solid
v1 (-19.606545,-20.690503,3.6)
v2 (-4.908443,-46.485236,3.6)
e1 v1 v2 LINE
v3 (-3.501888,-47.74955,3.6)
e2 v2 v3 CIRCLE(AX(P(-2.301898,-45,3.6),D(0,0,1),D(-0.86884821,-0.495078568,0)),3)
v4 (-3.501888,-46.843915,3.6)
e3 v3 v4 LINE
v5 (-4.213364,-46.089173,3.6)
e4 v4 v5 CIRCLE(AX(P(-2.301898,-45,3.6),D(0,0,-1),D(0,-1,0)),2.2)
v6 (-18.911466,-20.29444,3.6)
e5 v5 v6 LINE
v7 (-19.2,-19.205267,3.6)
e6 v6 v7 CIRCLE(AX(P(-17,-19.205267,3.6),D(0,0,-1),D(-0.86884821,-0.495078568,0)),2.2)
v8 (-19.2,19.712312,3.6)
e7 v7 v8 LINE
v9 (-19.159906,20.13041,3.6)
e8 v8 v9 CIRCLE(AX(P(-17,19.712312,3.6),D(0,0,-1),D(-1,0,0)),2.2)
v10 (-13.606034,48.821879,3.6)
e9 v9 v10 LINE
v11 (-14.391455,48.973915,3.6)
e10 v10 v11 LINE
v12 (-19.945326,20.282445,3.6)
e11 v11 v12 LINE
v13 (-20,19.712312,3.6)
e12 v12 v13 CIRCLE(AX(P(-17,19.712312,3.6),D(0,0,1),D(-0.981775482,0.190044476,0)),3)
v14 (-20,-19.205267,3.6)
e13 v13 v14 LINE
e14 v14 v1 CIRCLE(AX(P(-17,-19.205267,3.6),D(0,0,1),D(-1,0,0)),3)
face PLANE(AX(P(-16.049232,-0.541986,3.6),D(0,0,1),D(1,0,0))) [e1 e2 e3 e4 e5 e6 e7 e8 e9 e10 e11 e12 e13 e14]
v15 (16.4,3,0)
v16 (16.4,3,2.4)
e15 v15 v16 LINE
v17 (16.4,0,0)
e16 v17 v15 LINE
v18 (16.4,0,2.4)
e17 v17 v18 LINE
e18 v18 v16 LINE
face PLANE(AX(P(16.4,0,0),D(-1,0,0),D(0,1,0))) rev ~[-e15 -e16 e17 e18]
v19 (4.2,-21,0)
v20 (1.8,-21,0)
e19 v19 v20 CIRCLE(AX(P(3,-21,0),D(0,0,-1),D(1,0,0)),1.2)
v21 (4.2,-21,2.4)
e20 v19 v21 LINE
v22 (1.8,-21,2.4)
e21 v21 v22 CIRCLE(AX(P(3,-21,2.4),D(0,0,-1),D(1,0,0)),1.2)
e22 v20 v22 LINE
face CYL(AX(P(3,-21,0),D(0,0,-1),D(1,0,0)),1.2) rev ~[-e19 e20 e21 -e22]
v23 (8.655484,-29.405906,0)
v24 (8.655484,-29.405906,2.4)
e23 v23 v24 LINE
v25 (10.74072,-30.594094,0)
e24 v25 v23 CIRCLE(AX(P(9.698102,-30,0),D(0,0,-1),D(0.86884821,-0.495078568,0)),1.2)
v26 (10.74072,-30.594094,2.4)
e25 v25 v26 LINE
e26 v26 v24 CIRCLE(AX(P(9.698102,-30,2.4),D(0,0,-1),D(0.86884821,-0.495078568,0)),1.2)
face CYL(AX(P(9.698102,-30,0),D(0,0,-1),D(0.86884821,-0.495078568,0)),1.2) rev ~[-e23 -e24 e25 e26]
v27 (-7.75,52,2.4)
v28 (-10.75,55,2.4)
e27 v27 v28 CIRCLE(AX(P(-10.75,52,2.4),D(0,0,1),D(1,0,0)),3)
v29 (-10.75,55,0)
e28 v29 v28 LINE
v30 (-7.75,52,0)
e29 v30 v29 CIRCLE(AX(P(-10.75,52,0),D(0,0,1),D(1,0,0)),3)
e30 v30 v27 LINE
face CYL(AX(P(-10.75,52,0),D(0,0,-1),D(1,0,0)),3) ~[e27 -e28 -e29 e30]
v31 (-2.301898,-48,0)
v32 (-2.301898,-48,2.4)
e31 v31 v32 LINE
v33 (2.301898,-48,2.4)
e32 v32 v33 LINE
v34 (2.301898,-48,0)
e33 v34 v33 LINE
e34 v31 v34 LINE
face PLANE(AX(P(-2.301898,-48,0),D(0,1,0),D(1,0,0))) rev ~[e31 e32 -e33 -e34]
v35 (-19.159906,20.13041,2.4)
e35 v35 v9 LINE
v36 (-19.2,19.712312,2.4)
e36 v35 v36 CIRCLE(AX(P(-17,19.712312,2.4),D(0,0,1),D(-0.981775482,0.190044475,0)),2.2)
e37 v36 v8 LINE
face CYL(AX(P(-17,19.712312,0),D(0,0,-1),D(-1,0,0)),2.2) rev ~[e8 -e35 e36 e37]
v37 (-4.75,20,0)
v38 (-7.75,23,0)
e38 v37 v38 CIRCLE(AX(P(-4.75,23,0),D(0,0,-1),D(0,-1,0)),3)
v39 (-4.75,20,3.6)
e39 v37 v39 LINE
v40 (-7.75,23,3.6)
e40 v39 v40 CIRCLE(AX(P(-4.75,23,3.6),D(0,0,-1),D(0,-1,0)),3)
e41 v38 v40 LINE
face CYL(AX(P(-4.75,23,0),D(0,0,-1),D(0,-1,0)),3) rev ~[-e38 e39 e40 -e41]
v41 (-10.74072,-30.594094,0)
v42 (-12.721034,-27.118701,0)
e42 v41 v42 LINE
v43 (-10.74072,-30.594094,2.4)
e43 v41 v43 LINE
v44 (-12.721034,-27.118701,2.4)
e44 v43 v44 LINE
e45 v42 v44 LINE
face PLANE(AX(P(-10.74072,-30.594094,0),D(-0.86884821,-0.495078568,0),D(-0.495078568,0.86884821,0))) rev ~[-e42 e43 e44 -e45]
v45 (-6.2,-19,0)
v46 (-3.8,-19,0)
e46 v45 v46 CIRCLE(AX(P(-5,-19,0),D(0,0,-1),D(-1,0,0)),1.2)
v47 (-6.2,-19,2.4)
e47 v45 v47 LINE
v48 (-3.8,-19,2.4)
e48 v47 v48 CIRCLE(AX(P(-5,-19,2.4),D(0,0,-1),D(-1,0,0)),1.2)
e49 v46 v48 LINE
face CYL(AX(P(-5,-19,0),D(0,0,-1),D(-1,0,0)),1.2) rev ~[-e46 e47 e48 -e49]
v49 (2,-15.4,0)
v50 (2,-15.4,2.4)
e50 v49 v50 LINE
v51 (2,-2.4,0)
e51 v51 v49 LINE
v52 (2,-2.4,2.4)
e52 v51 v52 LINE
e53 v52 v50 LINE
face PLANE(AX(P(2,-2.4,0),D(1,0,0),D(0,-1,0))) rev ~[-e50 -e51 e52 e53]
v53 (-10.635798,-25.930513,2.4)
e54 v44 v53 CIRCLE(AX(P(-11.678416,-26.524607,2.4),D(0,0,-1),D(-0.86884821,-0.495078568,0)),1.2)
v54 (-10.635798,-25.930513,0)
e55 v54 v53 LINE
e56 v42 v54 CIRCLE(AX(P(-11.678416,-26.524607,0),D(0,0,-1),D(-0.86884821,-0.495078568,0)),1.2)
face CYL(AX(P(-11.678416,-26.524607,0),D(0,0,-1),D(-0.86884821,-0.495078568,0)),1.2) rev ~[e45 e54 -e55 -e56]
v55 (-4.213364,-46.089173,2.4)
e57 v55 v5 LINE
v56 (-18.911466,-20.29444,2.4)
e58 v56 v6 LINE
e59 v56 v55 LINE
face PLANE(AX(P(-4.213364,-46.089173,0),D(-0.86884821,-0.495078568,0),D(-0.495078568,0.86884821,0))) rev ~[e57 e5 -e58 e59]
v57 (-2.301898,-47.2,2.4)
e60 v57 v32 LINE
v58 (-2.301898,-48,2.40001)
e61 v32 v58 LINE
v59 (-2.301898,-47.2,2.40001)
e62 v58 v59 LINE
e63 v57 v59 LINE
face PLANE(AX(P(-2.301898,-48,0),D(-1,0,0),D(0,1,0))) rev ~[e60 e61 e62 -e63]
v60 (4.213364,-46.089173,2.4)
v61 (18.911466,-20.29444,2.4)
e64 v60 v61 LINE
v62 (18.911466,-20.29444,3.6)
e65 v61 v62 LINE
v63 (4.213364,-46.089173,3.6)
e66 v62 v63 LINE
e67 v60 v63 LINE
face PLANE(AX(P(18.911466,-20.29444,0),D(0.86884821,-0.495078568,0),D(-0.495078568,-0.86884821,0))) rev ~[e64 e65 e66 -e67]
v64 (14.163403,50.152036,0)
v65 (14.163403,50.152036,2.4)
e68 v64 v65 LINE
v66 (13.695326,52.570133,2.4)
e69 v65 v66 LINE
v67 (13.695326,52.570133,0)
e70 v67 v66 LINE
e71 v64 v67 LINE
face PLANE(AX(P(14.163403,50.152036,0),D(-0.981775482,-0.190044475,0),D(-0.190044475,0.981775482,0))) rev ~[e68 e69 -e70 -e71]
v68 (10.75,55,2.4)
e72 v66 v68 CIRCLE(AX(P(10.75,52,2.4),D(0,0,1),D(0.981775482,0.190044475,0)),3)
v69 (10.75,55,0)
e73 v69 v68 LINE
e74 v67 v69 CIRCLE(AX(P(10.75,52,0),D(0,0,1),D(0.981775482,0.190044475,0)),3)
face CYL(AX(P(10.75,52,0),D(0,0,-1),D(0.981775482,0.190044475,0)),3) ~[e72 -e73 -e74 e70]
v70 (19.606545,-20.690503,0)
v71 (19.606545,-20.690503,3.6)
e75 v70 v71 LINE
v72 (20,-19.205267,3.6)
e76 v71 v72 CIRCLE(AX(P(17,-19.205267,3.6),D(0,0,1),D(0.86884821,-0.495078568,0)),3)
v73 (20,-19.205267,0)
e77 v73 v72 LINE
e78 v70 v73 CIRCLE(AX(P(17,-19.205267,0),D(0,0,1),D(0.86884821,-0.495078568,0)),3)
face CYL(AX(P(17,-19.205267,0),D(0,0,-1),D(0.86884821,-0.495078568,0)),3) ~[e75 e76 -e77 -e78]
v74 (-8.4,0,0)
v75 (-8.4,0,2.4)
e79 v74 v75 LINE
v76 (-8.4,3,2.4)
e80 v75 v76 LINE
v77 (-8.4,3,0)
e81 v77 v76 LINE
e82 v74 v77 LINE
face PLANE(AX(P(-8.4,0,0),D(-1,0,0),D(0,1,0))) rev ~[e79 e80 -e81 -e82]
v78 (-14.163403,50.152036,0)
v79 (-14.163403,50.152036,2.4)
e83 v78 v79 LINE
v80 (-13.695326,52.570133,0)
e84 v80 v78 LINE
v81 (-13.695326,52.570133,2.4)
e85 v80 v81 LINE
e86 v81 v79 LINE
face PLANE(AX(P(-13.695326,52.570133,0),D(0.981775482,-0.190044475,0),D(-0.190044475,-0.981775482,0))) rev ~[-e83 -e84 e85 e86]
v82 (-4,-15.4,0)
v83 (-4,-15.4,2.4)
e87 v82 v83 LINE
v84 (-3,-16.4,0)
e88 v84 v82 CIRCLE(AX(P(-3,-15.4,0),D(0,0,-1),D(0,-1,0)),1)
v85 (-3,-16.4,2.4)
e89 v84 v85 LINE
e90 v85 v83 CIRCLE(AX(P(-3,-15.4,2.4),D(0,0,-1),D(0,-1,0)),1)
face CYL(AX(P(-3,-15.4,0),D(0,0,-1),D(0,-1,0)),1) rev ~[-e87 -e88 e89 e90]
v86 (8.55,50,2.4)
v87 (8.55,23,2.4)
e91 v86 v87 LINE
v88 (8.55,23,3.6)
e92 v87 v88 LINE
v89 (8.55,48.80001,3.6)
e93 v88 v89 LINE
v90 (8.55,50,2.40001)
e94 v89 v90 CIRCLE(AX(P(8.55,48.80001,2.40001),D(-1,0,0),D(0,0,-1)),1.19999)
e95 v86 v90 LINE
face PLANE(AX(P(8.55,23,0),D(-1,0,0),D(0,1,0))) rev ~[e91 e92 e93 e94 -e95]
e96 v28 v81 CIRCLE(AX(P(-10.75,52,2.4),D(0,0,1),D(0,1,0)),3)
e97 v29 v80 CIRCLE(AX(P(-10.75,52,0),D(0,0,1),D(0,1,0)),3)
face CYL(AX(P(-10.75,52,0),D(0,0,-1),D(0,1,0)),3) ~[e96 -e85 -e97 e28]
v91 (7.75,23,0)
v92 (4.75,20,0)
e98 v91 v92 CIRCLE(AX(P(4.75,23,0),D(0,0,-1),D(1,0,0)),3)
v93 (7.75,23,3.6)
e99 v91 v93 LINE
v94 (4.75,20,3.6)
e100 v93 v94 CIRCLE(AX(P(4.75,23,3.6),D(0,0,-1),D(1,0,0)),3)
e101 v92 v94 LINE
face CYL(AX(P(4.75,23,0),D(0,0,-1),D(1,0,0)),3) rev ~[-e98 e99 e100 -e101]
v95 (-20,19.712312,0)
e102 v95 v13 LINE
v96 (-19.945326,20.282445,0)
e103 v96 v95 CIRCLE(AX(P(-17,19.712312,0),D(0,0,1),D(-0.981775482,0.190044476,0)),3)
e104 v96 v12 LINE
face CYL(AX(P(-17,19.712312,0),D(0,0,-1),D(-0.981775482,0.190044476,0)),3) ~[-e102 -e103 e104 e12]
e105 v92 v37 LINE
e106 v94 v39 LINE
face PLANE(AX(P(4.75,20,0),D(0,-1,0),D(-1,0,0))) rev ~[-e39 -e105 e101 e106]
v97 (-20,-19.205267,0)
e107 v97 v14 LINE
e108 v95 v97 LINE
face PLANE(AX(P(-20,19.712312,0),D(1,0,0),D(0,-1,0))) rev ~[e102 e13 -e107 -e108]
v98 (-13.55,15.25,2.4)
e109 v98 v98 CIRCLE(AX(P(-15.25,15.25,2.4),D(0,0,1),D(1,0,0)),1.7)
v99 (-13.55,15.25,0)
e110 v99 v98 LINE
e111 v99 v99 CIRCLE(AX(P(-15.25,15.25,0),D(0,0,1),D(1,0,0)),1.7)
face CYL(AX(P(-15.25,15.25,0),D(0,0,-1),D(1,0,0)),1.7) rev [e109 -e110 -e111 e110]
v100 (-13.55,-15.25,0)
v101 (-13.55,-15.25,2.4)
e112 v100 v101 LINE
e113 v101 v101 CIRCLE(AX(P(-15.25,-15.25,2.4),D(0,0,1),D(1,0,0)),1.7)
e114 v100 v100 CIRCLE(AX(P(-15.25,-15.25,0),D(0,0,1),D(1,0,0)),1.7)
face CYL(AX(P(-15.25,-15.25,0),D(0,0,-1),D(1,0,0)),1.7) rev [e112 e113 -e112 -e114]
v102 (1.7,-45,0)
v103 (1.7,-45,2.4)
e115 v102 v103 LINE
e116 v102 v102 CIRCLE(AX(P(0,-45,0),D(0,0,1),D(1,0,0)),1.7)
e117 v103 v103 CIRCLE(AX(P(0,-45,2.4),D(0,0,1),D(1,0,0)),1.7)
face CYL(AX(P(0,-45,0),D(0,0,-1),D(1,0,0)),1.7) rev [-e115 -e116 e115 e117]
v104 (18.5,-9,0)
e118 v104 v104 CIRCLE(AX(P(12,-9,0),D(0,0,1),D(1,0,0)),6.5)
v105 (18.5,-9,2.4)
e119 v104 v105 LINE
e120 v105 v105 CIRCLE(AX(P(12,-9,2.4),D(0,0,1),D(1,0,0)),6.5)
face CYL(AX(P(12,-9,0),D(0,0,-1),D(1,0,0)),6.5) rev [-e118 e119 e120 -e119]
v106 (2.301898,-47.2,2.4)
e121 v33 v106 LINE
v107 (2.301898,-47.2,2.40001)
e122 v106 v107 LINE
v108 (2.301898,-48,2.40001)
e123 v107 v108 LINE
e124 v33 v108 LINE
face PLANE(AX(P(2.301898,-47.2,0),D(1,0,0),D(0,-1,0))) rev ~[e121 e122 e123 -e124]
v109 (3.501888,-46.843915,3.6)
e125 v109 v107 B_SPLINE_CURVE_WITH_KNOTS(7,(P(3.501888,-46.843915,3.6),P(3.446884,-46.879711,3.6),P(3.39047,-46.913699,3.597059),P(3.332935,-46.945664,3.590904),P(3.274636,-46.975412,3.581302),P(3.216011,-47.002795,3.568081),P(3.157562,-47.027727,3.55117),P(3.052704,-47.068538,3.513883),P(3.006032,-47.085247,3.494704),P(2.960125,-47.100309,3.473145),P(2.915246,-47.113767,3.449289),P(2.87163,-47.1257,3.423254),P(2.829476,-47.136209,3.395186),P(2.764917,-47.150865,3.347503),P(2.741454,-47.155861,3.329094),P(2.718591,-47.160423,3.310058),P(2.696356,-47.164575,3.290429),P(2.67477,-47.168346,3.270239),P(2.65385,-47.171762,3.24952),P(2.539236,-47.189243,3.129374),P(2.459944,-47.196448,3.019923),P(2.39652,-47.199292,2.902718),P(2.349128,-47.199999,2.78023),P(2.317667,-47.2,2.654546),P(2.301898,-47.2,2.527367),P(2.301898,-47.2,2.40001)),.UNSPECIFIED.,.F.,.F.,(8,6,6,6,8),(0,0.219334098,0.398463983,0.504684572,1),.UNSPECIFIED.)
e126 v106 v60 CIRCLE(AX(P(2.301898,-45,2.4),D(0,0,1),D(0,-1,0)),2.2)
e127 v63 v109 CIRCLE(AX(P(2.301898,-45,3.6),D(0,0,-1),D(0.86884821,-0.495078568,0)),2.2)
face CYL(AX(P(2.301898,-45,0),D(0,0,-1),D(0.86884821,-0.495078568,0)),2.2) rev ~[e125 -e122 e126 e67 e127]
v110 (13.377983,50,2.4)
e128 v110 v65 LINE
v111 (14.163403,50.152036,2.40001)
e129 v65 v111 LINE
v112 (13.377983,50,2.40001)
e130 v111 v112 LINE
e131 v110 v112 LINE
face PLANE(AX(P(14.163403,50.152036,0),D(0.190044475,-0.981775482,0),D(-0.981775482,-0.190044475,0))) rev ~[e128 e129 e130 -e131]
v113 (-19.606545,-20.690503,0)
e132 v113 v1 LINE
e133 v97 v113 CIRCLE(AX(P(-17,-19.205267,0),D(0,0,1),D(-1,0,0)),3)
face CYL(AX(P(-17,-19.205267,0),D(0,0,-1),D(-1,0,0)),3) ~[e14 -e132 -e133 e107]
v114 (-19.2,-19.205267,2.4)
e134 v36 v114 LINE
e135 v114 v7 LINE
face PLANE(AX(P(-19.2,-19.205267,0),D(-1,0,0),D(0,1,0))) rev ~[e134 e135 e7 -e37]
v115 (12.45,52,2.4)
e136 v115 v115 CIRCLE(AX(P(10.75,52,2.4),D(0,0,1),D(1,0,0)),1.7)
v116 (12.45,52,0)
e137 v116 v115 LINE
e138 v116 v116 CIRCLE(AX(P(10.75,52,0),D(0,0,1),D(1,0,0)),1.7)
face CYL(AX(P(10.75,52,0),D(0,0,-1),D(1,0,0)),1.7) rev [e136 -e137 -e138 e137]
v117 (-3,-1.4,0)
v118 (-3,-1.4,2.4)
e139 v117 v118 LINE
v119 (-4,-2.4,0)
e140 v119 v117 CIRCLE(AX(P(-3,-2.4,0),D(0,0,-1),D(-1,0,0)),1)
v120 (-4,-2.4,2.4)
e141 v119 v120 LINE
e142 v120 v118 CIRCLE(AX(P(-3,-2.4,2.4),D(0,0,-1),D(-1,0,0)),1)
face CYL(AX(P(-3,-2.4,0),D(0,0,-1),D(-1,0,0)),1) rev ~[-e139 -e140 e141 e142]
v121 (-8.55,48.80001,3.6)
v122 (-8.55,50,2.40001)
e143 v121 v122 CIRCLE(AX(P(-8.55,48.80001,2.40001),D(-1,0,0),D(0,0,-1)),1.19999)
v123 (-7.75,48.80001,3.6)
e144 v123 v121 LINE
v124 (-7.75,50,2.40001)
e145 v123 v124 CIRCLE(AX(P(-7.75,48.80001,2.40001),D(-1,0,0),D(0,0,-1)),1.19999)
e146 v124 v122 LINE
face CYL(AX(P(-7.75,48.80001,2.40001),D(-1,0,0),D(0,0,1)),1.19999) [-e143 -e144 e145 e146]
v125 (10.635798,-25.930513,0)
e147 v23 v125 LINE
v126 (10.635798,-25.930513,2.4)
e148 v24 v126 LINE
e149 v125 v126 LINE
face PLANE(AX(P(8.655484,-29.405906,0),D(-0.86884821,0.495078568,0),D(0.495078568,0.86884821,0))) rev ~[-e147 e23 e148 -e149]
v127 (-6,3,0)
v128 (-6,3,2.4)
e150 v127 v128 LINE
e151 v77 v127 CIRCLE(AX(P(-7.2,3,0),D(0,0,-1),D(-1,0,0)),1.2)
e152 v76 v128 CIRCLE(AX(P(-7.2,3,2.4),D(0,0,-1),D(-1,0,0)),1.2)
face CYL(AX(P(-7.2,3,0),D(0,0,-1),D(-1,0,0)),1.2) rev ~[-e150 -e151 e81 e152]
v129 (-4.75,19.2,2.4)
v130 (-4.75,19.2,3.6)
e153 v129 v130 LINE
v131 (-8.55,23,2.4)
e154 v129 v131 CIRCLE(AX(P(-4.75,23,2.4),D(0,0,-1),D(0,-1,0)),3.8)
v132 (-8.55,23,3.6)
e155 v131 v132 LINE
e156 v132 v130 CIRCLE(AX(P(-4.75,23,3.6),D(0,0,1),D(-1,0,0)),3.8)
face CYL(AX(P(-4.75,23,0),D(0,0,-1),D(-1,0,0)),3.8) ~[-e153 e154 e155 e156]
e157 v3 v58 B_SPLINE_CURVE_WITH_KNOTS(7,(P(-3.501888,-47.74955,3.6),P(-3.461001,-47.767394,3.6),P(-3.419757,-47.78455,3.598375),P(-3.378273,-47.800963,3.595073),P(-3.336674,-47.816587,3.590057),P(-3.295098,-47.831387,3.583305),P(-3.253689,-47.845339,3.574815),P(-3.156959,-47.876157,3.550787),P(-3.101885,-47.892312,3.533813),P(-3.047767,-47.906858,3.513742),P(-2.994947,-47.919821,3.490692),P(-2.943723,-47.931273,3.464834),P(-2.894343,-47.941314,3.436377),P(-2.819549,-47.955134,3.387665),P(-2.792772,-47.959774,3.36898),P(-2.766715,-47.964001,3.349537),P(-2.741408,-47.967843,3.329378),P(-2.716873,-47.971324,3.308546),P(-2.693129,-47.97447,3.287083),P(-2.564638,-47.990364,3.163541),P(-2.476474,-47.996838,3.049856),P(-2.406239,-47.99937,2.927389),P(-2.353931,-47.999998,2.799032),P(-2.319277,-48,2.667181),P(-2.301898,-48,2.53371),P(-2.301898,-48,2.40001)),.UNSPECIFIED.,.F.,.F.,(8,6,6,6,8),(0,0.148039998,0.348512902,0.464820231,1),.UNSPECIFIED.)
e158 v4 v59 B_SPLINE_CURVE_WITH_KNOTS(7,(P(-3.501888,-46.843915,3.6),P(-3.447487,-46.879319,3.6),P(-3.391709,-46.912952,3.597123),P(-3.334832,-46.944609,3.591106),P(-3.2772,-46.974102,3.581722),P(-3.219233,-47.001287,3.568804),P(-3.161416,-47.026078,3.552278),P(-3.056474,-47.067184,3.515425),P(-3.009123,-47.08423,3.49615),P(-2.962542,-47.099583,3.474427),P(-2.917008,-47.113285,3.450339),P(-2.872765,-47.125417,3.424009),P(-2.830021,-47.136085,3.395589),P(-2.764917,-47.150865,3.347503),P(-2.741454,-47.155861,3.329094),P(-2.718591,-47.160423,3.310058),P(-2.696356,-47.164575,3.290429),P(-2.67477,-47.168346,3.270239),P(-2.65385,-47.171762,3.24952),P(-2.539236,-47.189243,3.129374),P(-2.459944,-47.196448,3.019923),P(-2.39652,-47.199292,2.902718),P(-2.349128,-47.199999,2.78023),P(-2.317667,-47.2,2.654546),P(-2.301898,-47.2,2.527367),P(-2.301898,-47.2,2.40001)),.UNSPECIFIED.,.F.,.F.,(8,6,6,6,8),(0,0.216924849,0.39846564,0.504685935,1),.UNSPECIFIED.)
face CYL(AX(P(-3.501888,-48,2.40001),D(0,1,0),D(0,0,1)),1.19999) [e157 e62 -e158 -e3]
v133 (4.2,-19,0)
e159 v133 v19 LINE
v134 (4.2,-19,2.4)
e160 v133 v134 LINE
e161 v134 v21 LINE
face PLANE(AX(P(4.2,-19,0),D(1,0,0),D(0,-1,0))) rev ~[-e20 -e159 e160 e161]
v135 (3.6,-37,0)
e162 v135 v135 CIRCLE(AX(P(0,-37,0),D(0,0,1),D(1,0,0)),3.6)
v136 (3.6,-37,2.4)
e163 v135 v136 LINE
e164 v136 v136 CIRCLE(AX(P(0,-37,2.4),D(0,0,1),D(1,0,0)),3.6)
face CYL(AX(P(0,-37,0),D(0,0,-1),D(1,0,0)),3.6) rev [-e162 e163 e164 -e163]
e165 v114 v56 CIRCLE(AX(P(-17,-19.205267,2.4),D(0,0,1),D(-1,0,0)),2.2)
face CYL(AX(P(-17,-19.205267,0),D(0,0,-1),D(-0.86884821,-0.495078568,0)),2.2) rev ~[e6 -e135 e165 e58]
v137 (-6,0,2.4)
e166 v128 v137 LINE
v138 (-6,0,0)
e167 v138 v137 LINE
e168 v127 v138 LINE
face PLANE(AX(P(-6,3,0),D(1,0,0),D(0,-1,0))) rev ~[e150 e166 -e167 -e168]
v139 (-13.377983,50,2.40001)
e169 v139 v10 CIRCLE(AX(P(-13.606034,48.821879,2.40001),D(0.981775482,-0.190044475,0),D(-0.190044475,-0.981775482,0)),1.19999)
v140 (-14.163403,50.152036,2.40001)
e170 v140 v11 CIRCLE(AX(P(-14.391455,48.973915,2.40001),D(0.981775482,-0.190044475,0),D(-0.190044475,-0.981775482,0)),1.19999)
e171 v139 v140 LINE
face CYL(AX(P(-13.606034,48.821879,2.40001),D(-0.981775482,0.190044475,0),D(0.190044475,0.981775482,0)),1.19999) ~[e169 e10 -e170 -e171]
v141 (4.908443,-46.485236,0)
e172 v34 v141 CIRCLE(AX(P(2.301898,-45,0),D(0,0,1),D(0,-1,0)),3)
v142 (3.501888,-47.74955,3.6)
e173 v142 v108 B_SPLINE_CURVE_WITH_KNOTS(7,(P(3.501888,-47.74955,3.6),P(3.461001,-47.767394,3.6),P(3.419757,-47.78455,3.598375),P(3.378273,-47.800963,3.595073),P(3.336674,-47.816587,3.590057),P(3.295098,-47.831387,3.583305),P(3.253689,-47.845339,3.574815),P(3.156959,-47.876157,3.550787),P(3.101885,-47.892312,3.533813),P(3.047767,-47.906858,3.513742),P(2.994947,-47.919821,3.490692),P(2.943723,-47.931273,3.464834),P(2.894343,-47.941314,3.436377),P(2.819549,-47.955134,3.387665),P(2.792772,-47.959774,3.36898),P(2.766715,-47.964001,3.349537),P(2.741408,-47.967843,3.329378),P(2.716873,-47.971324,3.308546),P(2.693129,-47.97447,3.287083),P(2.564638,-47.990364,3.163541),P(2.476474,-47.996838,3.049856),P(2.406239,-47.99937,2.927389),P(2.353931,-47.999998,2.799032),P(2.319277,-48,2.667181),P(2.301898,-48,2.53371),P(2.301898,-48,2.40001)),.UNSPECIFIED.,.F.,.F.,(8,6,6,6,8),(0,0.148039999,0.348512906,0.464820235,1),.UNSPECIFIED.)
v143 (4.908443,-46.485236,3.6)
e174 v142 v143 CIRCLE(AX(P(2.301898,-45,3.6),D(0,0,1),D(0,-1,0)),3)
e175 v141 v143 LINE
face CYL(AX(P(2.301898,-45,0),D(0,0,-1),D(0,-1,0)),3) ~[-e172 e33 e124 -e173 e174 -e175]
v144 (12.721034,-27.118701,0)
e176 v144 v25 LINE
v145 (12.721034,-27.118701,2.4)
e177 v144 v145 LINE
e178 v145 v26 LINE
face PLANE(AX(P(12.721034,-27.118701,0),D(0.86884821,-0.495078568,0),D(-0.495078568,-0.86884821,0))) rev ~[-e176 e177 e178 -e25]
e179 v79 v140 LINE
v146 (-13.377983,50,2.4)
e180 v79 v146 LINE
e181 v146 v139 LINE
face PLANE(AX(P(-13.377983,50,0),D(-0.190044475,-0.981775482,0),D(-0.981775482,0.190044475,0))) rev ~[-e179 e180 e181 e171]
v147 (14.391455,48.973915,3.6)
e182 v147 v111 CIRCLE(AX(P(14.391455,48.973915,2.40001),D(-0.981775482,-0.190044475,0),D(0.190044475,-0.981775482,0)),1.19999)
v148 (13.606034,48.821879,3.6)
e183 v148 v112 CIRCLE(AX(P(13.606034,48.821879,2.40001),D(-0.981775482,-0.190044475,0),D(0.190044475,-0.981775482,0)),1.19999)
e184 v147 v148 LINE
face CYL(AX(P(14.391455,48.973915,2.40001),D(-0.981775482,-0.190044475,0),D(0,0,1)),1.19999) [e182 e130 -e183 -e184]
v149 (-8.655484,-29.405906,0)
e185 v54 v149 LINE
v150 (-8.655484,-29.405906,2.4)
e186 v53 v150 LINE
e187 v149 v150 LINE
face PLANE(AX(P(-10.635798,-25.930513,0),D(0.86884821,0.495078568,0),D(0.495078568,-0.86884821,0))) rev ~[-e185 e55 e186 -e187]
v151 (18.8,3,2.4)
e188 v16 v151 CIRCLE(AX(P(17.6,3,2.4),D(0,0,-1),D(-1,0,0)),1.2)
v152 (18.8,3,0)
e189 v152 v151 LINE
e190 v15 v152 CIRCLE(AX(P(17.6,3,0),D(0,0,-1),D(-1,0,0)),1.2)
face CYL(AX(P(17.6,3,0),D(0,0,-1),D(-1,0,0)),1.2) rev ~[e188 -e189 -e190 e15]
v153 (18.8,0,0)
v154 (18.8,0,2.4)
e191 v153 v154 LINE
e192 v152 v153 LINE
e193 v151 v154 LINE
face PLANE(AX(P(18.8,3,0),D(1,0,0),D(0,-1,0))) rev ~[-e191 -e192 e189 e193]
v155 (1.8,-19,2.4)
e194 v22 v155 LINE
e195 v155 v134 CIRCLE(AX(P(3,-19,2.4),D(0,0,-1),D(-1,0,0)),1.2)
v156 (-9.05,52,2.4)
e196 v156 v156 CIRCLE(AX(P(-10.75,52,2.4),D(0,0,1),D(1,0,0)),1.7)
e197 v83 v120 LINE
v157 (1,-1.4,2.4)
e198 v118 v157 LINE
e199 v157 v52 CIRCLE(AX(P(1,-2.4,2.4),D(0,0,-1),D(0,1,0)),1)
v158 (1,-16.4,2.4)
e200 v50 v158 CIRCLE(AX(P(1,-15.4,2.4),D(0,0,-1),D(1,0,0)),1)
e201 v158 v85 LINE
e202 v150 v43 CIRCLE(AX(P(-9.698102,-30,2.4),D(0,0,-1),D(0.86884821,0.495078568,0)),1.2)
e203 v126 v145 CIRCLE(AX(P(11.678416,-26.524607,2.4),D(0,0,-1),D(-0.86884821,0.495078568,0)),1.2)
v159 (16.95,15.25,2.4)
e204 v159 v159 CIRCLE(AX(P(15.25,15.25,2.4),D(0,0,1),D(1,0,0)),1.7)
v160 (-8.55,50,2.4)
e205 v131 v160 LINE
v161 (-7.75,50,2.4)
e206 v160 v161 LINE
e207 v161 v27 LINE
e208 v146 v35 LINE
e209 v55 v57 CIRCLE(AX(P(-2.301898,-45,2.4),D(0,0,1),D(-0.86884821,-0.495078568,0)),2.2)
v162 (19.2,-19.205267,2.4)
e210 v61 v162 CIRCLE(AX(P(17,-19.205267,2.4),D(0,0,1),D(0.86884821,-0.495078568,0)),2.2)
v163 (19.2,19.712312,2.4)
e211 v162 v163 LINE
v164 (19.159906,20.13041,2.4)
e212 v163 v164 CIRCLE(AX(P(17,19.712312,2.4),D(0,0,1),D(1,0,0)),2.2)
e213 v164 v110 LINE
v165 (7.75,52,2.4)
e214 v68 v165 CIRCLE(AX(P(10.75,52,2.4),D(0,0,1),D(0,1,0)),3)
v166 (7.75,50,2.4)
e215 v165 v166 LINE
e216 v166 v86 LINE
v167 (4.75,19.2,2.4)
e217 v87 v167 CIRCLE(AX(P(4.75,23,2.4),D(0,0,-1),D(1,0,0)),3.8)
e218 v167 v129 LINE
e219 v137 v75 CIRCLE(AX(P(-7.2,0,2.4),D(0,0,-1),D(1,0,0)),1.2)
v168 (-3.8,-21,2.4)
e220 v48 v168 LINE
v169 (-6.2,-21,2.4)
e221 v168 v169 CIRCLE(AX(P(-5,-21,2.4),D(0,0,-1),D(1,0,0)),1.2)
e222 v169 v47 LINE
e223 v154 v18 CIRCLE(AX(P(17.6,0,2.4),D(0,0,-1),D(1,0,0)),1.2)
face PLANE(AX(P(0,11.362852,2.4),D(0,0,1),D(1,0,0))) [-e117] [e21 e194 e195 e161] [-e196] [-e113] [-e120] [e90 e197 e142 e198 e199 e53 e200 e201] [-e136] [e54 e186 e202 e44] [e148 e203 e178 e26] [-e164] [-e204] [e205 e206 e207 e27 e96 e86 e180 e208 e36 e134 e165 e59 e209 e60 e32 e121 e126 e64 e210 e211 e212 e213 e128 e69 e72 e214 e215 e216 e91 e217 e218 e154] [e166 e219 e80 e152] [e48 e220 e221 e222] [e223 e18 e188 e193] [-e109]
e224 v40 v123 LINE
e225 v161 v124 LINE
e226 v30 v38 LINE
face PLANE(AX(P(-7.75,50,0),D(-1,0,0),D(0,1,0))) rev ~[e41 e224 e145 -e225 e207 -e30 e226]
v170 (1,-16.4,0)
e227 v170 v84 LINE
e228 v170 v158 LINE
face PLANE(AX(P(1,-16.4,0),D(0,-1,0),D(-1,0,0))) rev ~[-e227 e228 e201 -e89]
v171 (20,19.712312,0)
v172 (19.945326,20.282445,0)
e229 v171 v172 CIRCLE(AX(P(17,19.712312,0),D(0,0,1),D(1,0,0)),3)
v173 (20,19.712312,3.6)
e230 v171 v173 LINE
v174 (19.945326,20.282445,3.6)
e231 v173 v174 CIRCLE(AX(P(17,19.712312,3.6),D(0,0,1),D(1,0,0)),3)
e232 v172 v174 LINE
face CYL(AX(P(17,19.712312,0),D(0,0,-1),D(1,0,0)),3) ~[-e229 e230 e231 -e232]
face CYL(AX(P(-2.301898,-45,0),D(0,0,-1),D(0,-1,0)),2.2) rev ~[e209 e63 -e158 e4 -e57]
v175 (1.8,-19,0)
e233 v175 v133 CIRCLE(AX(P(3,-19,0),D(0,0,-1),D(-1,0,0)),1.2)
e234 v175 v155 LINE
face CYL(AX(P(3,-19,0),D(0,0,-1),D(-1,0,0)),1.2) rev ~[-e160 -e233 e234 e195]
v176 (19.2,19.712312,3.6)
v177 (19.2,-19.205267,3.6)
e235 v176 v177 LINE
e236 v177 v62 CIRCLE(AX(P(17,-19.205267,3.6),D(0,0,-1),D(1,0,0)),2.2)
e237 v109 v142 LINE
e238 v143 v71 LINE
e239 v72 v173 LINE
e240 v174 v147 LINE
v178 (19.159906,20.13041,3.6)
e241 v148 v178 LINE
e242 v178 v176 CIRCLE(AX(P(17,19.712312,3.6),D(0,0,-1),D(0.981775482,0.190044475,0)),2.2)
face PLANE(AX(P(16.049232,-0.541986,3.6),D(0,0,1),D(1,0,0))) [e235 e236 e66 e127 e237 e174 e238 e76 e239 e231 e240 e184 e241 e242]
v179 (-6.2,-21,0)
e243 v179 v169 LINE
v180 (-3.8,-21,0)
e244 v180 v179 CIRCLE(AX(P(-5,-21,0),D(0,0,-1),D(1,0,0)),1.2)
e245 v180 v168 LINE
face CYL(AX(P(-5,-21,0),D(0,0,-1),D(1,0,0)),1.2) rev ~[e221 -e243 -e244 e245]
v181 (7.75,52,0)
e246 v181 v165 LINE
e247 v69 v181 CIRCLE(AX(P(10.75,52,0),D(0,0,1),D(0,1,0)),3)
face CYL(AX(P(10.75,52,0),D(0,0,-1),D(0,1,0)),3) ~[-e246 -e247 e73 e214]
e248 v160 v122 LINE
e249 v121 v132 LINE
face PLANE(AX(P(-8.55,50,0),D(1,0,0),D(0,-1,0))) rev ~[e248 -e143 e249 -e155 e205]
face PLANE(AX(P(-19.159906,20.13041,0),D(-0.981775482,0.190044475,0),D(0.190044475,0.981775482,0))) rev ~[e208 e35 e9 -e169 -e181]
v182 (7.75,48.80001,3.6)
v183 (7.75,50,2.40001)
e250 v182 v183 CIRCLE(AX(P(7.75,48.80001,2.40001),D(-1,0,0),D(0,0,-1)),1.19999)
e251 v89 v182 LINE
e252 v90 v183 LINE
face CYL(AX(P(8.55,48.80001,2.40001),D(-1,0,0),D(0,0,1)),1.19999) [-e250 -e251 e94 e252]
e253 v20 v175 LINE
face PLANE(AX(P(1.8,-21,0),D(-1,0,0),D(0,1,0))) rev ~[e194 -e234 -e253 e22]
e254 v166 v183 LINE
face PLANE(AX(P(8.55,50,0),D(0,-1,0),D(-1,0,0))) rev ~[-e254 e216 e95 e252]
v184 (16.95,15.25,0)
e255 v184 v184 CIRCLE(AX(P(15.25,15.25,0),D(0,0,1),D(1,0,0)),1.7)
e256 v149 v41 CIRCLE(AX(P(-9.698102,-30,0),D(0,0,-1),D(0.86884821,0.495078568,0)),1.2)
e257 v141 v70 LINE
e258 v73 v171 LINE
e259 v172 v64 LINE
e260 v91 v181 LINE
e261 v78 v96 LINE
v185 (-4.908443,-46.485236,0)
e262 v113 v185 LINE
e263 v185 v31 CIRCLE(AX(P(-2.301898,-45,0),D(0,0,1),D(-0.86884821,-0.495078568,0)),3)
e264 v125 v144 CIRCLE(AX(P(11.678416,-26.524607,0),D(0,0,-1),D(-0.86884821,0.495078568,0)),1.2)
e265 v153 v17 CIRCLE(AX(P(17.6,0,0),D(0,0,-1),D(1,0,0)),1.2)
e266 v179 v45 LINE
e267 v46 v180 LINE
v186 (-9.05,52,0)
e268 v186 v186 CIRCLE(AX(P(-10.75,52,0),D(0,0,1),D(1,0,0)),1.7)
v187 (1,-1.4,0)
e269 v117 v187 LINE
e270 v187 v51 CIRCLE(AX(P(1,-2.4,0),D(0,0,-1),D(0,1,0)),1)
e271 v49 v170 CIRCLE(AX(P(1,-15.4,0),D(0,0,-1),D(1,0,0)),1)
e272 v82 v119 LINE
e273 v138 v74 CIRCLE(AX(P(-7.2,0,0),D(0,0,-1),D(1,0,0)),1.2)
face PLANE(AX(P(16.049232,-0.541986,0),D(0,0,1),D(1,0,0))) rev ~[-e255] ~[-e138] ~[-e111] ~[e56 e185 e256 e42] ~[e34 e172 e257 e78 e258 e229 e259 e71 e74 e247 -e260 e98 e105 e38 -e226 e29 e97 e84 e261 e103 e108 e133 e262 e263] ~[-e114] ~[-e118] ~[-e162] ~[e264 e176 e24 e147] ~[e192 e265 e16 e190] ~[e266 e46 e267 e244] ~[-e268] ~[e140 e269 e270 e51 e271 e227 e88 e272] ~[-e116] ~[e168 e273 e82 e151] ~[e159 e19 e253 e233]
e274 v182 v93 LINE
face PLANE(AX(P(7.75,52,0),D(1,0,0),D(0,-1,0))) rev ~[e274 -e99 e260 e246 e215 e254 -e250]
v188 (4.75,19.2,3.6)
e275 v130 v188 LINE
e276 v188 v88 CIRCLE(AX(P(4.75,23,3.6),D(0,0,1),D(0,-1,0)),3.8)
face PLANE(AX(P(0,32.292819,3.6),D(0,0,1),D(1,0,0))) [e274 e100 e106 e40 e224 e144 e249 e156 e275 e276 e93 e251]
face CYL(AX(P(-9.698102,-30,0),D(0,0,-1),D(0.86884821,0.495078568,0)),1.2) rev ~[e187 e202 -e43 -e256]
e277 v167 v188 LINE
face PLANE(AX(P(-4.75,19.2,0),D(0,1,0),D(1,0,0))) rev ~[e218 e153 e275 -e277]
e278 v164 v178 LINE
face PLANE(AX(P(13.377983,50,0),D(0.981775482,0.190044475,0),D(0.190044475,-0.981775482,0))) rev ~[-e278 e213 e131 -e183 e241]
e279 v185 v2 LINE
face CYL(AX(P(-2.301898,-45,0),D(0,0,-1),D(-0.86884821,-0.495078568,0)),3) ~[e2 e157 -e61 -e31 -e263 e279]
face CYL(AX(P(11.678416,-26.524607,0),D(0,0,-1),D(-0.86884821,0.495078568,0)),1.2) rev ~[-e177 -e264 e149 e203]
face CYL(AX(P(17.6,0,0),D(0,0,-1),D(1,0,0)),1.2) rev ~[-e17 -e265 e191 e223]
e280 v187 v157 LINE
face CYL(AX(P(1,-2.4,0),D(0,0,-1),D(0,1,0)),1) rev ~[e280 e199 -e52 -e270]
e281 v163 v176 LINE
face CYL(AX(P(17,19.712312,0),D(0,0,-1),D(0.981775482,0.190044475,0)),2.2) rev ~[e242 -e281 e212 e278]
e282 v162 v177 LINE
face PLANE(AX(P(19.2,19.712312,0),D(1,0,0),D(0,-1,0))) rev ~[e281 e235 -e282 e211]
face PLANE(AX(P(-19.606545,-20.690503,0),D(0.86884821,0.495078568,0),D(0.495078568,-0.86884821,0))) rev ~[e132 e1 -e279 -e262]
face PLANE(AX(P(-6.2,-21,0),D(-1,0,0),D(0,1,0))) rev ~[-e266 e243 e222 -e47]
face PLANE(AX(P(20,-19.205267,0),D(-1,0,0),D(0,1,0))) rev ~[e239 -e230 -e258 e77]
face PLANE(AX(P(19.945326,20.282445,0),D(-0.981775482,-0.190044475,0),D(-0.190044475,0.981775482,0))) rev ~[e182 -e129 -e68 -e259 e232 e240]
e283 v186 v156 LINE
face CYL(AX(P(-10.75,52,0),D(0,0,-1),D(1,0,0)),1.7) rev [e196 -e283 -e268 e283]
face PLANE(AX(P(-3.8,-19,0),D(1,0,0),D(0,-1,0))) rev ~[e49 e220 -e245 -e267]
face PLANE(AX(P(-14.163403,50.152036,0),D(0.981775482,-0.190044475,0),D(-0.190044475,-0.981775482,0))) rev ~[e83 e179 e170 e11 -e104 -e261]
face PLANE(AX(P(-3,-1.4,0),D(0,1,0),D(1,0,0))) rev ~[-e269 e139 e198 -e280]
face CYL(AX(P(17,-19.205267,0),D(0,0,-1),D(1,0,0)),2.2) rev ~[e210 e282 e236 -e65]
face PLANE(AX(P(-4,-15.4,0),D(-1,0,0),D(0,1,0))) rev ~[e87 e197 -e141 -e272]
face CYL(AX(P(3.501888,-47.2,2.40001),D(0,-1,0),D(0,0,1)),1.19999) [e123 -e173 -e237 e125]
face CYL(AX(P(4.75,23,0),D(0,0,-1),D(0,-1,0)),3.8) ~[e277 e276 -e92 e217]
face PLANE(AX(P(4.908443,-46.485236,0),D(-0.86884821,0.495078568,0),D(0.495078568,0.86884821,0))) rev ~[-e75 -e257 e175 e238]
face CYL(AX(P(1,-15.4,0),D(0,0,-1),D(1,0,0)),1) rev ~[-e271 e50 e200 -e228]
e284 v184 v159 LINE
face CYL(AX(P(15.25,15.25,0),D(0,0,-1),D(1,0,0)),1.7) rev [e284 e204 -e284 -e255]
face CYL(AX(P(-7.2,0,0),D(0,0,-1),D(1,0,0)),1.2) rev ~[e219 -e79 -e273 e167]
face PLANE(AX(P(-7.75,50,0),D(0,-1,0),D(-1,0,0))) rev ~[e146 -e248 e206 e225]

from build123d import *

# Parameters (mm, degrees)
F0_R     = 1.7
F0_R_2   = 3.6
F0_R_3   = 6.5
F1_DEPTH = 2.4
F2_DEPTH = 3.6
F3_R     = 1.19999


# Not quite as in the source:
# - a fillet or chamfer is up to 0.001 mm smaller than in the source, because OpenCascade refuses the exact size


with BuildPart() as f1:
    # F0 (on Top) → F1 (new body)
    with BuildSketch(Plane.XY):
        with BuildLine():
            Line((13.3779826676, 50), (14.1634030533, 50.1520355803))
            Line((14.1634030533, 50.1520355803), (13.6953264465, 52.5701334259))
            ThreePointArc((13.6953264465, 52.5701334259), (12.6591358938, 54.3141305363), (10.75, 55))
            ThreePointArc((10.75, 55), (8.6286796564, 54.1213203436), (7.75, 52))
            Line((7.75, 52), (7.75, 50))
            Line((7.75, 50), (8.55, 50))
            Line((8.55, 50), (8.55, 23))
            ThreePointArc((8.55, 23), (7.4370057685, 20.3129942315), (4.75, 19.2))
            Line((4.75, 19.2), (0, 19.2))
            Line((0, 19.2), (-4.75, 19.2))
            ThreePointArc((-4.75, 19.2), (-7.4370057685, 20.3129942315), (-8.55, 23))
            Line((-8.55, 23), (-8.55, 50))
            Line((-8.55, 50), (-7.75, 50))
            Line((-7.75, 50), (-7.75, 52))
            ThreePointArc((-7.75, 52), (-8.6286796564, 54.1213203436), (-10.75, 55))
            ThreePointArc((-10.75, 55), (-12.6591358938, 54.3141305363), (-13.6953264465, 52.5701334259))
            Line((-13.6953264465, 52.5701334259), (-14.1634030533, 50.1520355803))
            Line((-14.1634030533, 50.1520355803), (-13.3779826676, 50))
            Line((-13.3779826676, 50), (-19.1599060608, 20.1304096433))
            ThreePointArc((-19.1599060608, 20.1304096433), (-19.1899535764, 19.9223197335), (-19.2, 19.7123117976))
            Line((-19.2, 19.7123117976), (-19.2, 0))
            Line((-19.2, 0), (-19.2, -19.2052668078))
            ThreePointArc((-19.2, -19.2052668078), (-19.1266435215, -19.768638206), (-18.9114660616, -20.294439657))
            Line((-18.9114660616, -20.294439657), (-4.2133641117, -46.0891728492))
            ThreePointArc((-4.2133641117, -46.0891728492), (-3.4072983694, -46.9021277912), (-2.3018980501, -47.2))
            Line((-2.3018980501, -47.2), (-2.3018980501, -48))
            Line((-2.3018980501, -48), (0, -48))
            Line((0, -48), (2.3018980501, -48))
            Line((2.3018980501, -48), (2.3018980501, -47.2))
            ThreePointArc((2.3018980501, -47.2), (3.4072983694, -46.9021277912), (4.2133641117, -46.0891728492))
            Line((4.2133641117, -46.0891728492), (18.9114660616, -20.294439657))
            ThreePointArc((18.9114660616, -20.294439657), (19.1266435215, -19.768638206), (19.2, -19.2052668078))
            Line((19.2, -19.2052668078), (19.2, 0))
            Line((19.2, 0), (19.2, 19.7123117976))
            ThreePointArc((19.2, 19.7123117976), (19.1899535764, 19.9223197335), (19.1599060608, 20.1304096433))
            Line((19.1599060608, 20.1304096433), (13.3779826676, 50))
        make_face()
        with BuildLine():
            ThreePointArc((-8.6554840981, -29.4059057186), (-9.1040076685, -31.0426178518), (-10.7407198016, -30.5940942814))
            Line((-10.7407198016, -30.5940942814), (-12.721034073, -27.1187014422))
            ThreePointArc((-12.721034073, -27.1187014422), (-12.2725105026, -25.4819893091), (-10.6357983695, -25.9305128794))
            Line((-10.6357983695, -25.9305128794), (-8.6554840981, -29.4059057186))
        make_face(mode=Mode.SUBTRACT)
        with Locations((-15.25, -15.25)):
            Circle(F0_R, mode=Mode.SUBTRACT)
        with BuildLine():
            Line((-6.2, -21), (-6.2, -19))
            ThreePointArc((-6.2, -19), (-5, -17.8), (-3.8, -19))
            Line((-3.8, -19), (-3.8, -21))
            ThreePointArc((-3.8, -21), (-5, -22.2), (-6.2, -21))
        make_face(mode=Mode.SUBTRACT)
        with BuildLine():
            Line((-8.4, 0), (-8.4, 3))
            ThreePointArc((-8.4, 3), (-7.2, 4.2), (-6, 3))
            Line((-6, 3), (-6, 0))
            ThreePointArc((-6, 0), (-7.2, -1.2), (-8.4, 0))
        make_face(mode=Mode.SUBTRACT)
        with BuildLine():
            ThreePointArc((-4, -2.4), (-3.7071067812, -1.6928932188), (-3, -1.4))
            Line((-3, -1.4), (1, -1.4))
            ThreePointArc((1, -1.4), (1.7071067812, -1.6928932188), (2, -2.4))
            Line((2, -2.4), (2, -15.4))
            ThreePointArc((2, -15.4), (1.7071067812, -16.1071067812), (1, -16.4))
            Line((1, -16.4), (-3, -16.4))
            ThreePointArc((-3, -16.4), (-3.7071067812, -16.1071067812), (-4, -15.4))
            Line((-4, -15.4), (-4, -2.4))
        make_face(mode=Mode.SUBTRACT)
        with Locations((0, -45)):
            Circle(F0_R, mode=Mode.SUBTRACT)
        with Locations((0, -37)):
            Circle(F0_R_2, mode=Mode.SUBTRACT)
        with BuildLine():
            Line((12.721034073, -27.1187014422), (10.7407198016, -30.5940942814))
            ThreePointArc((10.7407198016, -30.5940942814), (9.1040076685, -31.0426178518), (8.6554840981, -29.4059057186))
            Line((8.6554840981, -29.4059057186), (10.6357983695, -25.9305128794))
            ThreePointArc((10.6357983695, -25.9305128794), (12.2725105026, -25.4819893091), (12.721034073, -27.1187014422))
        make_face(mode=Mode.SUBTRACT)
        with BuildLine():
            Line((1.8, -21), (1.8, -19))
            ThreePointArc((1.8, -19), (3, -17.8), (4.2, -19))
            Line((4.2, -19), (4.2, -21))
            ThreePointArc((4.2, -21), (3, -22.2), (1.8, -21))
        make_face(mode=Mode.SUBTRACT)
        with Locations((12, -9)):
            Circle(F0_R_3, mode=Mode.SUBTRACT)
        with BuildLine():
            Line((18.8, 3), (18.8, 0))
            ThreePointArc((18.8, 0), (17.6, -1.2), (16.4, 0))
            Line((16.4, 0), (16.4, 3))
            ThreePointArc((16.4, 3), (17.6, 4.2), (18.8, 3))
        make_face(mode=Mode.SUBTRACT)
        with Locations((-15.25, 15.25)):
            Circle(F0_R, mode=Mode.SUBTRACT)
        with Locations((-10.75, 52)):
            Circle(F0_R, mode=Mode.SUBTRACT)
        with Locations((15.25, 15.25)):
            Circle(F0_R, mode=Mode.SUBTRACT)
        with Locations((10.75, 52)):
            Circle(F0_R, mode=Mode.SUBTRACT)
    extrude(amount=F1_DEPTH)

    # F0 (on Top) → F2 (join)
    with BuildSketch(Plane.XY):
        with BuildLine():
            Line((20, -19.2052668078), (20, 0))
            Line((20, 0), (20, 19.7123117976))
            ThreePointArc((20, 19.7123117976), (19.9863003315, 19.9986862557), (19.9453264465, 20.2824452236))
            Line((19.9453264465, 20.2824452236), (14.1634030533, 50.1520355803))
            Line((14.1634030533, 50.1520355803), (13.3779826676, 50))
            Line((13.3779826676, 50), (19.1599060608, 20.1304096433))
            ThreePointArc((19.1599060608, 20.1304096433), (19.1899535764, 19.9223197335), (19.2, 19.7123117976))
            Line((19.2, 19.7123117976), (19.2, 0))
            Line((19.2, 0), (19.2, -19.2052668078))
            ThreePointArc((19.2, -19.2052668078), (19.1266435215, -19.768638206), (18.9114660616, -20.294439657))
            Line((18.9114660616, -20.294439657), (4.2133641117, -46.0891728492))
            ThreePointArc((4.2133641117, -46.0891728492), (3.4072983694, -46.9021277912), (2.3018980501, -47.2))
            Line((2.3018980501, -47.2), (2.3018980501, -48))
            ThreePointArc((2.3018980501, -48), (3.8092621219, -47.5938106244), (4.9084426795, -46.4852357035))
            Line((4.9084426795, -46.4852357035), (19.6065446294, -20.6905025113))
            ThreePointArc((19.6065446294, -20.6905025113), (19.8999684385, -19.9735005326), (20, -19.2052668078))
        make_face()
        with BuildLine():
            Line((8.55, 50), (7.75, 50))
            Line((7.75, 50), (7.75, 23))
            ThreePointArc((7.75, 23), (6.8713203436, 20.8786796564), (4.75, 20))
            Line((4.75, 20), (0, 20))
            Line((0, 20), (-4.75, 20))
            ThreePointArc((-4.75, 20), (-6.8713203436, 20.8786796564), (-7.75, 23))
            Line((-7.75, 23), (-7.75, 50))
            Line((-7.75, 50), (-8.55, 50))
            Line((-8.55, 50), (-8.55, 23))
            ThreePointArc((-8.55, 23), (-7.4370057685, 20.3129942315), (-4.75, 19.2))
            Line((-4.75, 19.2), (0, 19.2))
            Line((0, 19.2), (4.75, 19.2))
            ThreePointArc((4.75, 19.2), (7.4370057685, 20.3129942315), (8.55, 23))
            Line((8.55, 23), (8.55, 50))
        make_face()
        with BuildLine():
            ThreePointArc((-4.9084426795, -46.4852357035), (-3.8092621219, -47.5938106244), (-2.3018980501, -48))
            Line((-2.3018980501, -48), (-2.3018980501, -47.2))
            ThreePointArc((-2.3018980501, -47.2), (-3.4072983694, -46.9021277912), (-4.2133641117, -46.0891728492))
            Line((-4.2133641117, -46.0891728492), (-18.9114660616, -20.294439657))
            ThreePointArc((-18.9114660616, -20.294439657), (-19.1266435215, -19.768638206), (-19.2, -19.2052668078))
            Line((-19.2, -19.2052668078), (-19.2, 0))
            Line((-19.2, 0), (-19.2, 19.7123117976))
            ThreePointArc((-19.2, 19.7123117976), (-19.1899535764, 19.9223197335), (-19.1599060608, 20.1304096433))
            Line((-19.1599060608, 20.1304096433), (-13.3779826676, 50))
            Line((-13.3779826676, 50), (-14.1634030533, 50.1520355803))
            Line((-14.1634030533, 50.1520355803), (-19.9453264465, 20.2824452236))
            ThreePointArc((-19.9453264465, 20.2824452236), (-19.9863003315, 19.9986862557), (-20, 19.7123117976))
            Line((-20, 19.7123117976), (-20, 0))
            Line((-20, 0), (-20, -19.2052668078))
            ThreePointArc((-20, -19.2052668078), (-19.8999684385, -19.9735005326), (-19.6065446294, -20.6905025113))
            Line((-19.6065446294, -20.6905025113), (-4.9084426795, -46.4852357035))
        make_face()
    extrude(amount=F2_DEPTH)

    # F3 (radius 1.2 in the source; OpenCascade refuses exactly that, so slightly less here)
    f3_edges = [f1.edges().sort_by_distance(p)[0] for p in [
        (-13.770693, 50.076018, 3.6),
        (-8.15, 50, 3.6),
        (8.15, 50, 3.6),
        (13.770693, 50.076018, 3.6),
        (-2.301898, -47.6, 3.6),
        (2.301898, -47.6, 3.6),
    ]]
    fillet(f3_edges, radius=F3_R)


solid = f1.part
